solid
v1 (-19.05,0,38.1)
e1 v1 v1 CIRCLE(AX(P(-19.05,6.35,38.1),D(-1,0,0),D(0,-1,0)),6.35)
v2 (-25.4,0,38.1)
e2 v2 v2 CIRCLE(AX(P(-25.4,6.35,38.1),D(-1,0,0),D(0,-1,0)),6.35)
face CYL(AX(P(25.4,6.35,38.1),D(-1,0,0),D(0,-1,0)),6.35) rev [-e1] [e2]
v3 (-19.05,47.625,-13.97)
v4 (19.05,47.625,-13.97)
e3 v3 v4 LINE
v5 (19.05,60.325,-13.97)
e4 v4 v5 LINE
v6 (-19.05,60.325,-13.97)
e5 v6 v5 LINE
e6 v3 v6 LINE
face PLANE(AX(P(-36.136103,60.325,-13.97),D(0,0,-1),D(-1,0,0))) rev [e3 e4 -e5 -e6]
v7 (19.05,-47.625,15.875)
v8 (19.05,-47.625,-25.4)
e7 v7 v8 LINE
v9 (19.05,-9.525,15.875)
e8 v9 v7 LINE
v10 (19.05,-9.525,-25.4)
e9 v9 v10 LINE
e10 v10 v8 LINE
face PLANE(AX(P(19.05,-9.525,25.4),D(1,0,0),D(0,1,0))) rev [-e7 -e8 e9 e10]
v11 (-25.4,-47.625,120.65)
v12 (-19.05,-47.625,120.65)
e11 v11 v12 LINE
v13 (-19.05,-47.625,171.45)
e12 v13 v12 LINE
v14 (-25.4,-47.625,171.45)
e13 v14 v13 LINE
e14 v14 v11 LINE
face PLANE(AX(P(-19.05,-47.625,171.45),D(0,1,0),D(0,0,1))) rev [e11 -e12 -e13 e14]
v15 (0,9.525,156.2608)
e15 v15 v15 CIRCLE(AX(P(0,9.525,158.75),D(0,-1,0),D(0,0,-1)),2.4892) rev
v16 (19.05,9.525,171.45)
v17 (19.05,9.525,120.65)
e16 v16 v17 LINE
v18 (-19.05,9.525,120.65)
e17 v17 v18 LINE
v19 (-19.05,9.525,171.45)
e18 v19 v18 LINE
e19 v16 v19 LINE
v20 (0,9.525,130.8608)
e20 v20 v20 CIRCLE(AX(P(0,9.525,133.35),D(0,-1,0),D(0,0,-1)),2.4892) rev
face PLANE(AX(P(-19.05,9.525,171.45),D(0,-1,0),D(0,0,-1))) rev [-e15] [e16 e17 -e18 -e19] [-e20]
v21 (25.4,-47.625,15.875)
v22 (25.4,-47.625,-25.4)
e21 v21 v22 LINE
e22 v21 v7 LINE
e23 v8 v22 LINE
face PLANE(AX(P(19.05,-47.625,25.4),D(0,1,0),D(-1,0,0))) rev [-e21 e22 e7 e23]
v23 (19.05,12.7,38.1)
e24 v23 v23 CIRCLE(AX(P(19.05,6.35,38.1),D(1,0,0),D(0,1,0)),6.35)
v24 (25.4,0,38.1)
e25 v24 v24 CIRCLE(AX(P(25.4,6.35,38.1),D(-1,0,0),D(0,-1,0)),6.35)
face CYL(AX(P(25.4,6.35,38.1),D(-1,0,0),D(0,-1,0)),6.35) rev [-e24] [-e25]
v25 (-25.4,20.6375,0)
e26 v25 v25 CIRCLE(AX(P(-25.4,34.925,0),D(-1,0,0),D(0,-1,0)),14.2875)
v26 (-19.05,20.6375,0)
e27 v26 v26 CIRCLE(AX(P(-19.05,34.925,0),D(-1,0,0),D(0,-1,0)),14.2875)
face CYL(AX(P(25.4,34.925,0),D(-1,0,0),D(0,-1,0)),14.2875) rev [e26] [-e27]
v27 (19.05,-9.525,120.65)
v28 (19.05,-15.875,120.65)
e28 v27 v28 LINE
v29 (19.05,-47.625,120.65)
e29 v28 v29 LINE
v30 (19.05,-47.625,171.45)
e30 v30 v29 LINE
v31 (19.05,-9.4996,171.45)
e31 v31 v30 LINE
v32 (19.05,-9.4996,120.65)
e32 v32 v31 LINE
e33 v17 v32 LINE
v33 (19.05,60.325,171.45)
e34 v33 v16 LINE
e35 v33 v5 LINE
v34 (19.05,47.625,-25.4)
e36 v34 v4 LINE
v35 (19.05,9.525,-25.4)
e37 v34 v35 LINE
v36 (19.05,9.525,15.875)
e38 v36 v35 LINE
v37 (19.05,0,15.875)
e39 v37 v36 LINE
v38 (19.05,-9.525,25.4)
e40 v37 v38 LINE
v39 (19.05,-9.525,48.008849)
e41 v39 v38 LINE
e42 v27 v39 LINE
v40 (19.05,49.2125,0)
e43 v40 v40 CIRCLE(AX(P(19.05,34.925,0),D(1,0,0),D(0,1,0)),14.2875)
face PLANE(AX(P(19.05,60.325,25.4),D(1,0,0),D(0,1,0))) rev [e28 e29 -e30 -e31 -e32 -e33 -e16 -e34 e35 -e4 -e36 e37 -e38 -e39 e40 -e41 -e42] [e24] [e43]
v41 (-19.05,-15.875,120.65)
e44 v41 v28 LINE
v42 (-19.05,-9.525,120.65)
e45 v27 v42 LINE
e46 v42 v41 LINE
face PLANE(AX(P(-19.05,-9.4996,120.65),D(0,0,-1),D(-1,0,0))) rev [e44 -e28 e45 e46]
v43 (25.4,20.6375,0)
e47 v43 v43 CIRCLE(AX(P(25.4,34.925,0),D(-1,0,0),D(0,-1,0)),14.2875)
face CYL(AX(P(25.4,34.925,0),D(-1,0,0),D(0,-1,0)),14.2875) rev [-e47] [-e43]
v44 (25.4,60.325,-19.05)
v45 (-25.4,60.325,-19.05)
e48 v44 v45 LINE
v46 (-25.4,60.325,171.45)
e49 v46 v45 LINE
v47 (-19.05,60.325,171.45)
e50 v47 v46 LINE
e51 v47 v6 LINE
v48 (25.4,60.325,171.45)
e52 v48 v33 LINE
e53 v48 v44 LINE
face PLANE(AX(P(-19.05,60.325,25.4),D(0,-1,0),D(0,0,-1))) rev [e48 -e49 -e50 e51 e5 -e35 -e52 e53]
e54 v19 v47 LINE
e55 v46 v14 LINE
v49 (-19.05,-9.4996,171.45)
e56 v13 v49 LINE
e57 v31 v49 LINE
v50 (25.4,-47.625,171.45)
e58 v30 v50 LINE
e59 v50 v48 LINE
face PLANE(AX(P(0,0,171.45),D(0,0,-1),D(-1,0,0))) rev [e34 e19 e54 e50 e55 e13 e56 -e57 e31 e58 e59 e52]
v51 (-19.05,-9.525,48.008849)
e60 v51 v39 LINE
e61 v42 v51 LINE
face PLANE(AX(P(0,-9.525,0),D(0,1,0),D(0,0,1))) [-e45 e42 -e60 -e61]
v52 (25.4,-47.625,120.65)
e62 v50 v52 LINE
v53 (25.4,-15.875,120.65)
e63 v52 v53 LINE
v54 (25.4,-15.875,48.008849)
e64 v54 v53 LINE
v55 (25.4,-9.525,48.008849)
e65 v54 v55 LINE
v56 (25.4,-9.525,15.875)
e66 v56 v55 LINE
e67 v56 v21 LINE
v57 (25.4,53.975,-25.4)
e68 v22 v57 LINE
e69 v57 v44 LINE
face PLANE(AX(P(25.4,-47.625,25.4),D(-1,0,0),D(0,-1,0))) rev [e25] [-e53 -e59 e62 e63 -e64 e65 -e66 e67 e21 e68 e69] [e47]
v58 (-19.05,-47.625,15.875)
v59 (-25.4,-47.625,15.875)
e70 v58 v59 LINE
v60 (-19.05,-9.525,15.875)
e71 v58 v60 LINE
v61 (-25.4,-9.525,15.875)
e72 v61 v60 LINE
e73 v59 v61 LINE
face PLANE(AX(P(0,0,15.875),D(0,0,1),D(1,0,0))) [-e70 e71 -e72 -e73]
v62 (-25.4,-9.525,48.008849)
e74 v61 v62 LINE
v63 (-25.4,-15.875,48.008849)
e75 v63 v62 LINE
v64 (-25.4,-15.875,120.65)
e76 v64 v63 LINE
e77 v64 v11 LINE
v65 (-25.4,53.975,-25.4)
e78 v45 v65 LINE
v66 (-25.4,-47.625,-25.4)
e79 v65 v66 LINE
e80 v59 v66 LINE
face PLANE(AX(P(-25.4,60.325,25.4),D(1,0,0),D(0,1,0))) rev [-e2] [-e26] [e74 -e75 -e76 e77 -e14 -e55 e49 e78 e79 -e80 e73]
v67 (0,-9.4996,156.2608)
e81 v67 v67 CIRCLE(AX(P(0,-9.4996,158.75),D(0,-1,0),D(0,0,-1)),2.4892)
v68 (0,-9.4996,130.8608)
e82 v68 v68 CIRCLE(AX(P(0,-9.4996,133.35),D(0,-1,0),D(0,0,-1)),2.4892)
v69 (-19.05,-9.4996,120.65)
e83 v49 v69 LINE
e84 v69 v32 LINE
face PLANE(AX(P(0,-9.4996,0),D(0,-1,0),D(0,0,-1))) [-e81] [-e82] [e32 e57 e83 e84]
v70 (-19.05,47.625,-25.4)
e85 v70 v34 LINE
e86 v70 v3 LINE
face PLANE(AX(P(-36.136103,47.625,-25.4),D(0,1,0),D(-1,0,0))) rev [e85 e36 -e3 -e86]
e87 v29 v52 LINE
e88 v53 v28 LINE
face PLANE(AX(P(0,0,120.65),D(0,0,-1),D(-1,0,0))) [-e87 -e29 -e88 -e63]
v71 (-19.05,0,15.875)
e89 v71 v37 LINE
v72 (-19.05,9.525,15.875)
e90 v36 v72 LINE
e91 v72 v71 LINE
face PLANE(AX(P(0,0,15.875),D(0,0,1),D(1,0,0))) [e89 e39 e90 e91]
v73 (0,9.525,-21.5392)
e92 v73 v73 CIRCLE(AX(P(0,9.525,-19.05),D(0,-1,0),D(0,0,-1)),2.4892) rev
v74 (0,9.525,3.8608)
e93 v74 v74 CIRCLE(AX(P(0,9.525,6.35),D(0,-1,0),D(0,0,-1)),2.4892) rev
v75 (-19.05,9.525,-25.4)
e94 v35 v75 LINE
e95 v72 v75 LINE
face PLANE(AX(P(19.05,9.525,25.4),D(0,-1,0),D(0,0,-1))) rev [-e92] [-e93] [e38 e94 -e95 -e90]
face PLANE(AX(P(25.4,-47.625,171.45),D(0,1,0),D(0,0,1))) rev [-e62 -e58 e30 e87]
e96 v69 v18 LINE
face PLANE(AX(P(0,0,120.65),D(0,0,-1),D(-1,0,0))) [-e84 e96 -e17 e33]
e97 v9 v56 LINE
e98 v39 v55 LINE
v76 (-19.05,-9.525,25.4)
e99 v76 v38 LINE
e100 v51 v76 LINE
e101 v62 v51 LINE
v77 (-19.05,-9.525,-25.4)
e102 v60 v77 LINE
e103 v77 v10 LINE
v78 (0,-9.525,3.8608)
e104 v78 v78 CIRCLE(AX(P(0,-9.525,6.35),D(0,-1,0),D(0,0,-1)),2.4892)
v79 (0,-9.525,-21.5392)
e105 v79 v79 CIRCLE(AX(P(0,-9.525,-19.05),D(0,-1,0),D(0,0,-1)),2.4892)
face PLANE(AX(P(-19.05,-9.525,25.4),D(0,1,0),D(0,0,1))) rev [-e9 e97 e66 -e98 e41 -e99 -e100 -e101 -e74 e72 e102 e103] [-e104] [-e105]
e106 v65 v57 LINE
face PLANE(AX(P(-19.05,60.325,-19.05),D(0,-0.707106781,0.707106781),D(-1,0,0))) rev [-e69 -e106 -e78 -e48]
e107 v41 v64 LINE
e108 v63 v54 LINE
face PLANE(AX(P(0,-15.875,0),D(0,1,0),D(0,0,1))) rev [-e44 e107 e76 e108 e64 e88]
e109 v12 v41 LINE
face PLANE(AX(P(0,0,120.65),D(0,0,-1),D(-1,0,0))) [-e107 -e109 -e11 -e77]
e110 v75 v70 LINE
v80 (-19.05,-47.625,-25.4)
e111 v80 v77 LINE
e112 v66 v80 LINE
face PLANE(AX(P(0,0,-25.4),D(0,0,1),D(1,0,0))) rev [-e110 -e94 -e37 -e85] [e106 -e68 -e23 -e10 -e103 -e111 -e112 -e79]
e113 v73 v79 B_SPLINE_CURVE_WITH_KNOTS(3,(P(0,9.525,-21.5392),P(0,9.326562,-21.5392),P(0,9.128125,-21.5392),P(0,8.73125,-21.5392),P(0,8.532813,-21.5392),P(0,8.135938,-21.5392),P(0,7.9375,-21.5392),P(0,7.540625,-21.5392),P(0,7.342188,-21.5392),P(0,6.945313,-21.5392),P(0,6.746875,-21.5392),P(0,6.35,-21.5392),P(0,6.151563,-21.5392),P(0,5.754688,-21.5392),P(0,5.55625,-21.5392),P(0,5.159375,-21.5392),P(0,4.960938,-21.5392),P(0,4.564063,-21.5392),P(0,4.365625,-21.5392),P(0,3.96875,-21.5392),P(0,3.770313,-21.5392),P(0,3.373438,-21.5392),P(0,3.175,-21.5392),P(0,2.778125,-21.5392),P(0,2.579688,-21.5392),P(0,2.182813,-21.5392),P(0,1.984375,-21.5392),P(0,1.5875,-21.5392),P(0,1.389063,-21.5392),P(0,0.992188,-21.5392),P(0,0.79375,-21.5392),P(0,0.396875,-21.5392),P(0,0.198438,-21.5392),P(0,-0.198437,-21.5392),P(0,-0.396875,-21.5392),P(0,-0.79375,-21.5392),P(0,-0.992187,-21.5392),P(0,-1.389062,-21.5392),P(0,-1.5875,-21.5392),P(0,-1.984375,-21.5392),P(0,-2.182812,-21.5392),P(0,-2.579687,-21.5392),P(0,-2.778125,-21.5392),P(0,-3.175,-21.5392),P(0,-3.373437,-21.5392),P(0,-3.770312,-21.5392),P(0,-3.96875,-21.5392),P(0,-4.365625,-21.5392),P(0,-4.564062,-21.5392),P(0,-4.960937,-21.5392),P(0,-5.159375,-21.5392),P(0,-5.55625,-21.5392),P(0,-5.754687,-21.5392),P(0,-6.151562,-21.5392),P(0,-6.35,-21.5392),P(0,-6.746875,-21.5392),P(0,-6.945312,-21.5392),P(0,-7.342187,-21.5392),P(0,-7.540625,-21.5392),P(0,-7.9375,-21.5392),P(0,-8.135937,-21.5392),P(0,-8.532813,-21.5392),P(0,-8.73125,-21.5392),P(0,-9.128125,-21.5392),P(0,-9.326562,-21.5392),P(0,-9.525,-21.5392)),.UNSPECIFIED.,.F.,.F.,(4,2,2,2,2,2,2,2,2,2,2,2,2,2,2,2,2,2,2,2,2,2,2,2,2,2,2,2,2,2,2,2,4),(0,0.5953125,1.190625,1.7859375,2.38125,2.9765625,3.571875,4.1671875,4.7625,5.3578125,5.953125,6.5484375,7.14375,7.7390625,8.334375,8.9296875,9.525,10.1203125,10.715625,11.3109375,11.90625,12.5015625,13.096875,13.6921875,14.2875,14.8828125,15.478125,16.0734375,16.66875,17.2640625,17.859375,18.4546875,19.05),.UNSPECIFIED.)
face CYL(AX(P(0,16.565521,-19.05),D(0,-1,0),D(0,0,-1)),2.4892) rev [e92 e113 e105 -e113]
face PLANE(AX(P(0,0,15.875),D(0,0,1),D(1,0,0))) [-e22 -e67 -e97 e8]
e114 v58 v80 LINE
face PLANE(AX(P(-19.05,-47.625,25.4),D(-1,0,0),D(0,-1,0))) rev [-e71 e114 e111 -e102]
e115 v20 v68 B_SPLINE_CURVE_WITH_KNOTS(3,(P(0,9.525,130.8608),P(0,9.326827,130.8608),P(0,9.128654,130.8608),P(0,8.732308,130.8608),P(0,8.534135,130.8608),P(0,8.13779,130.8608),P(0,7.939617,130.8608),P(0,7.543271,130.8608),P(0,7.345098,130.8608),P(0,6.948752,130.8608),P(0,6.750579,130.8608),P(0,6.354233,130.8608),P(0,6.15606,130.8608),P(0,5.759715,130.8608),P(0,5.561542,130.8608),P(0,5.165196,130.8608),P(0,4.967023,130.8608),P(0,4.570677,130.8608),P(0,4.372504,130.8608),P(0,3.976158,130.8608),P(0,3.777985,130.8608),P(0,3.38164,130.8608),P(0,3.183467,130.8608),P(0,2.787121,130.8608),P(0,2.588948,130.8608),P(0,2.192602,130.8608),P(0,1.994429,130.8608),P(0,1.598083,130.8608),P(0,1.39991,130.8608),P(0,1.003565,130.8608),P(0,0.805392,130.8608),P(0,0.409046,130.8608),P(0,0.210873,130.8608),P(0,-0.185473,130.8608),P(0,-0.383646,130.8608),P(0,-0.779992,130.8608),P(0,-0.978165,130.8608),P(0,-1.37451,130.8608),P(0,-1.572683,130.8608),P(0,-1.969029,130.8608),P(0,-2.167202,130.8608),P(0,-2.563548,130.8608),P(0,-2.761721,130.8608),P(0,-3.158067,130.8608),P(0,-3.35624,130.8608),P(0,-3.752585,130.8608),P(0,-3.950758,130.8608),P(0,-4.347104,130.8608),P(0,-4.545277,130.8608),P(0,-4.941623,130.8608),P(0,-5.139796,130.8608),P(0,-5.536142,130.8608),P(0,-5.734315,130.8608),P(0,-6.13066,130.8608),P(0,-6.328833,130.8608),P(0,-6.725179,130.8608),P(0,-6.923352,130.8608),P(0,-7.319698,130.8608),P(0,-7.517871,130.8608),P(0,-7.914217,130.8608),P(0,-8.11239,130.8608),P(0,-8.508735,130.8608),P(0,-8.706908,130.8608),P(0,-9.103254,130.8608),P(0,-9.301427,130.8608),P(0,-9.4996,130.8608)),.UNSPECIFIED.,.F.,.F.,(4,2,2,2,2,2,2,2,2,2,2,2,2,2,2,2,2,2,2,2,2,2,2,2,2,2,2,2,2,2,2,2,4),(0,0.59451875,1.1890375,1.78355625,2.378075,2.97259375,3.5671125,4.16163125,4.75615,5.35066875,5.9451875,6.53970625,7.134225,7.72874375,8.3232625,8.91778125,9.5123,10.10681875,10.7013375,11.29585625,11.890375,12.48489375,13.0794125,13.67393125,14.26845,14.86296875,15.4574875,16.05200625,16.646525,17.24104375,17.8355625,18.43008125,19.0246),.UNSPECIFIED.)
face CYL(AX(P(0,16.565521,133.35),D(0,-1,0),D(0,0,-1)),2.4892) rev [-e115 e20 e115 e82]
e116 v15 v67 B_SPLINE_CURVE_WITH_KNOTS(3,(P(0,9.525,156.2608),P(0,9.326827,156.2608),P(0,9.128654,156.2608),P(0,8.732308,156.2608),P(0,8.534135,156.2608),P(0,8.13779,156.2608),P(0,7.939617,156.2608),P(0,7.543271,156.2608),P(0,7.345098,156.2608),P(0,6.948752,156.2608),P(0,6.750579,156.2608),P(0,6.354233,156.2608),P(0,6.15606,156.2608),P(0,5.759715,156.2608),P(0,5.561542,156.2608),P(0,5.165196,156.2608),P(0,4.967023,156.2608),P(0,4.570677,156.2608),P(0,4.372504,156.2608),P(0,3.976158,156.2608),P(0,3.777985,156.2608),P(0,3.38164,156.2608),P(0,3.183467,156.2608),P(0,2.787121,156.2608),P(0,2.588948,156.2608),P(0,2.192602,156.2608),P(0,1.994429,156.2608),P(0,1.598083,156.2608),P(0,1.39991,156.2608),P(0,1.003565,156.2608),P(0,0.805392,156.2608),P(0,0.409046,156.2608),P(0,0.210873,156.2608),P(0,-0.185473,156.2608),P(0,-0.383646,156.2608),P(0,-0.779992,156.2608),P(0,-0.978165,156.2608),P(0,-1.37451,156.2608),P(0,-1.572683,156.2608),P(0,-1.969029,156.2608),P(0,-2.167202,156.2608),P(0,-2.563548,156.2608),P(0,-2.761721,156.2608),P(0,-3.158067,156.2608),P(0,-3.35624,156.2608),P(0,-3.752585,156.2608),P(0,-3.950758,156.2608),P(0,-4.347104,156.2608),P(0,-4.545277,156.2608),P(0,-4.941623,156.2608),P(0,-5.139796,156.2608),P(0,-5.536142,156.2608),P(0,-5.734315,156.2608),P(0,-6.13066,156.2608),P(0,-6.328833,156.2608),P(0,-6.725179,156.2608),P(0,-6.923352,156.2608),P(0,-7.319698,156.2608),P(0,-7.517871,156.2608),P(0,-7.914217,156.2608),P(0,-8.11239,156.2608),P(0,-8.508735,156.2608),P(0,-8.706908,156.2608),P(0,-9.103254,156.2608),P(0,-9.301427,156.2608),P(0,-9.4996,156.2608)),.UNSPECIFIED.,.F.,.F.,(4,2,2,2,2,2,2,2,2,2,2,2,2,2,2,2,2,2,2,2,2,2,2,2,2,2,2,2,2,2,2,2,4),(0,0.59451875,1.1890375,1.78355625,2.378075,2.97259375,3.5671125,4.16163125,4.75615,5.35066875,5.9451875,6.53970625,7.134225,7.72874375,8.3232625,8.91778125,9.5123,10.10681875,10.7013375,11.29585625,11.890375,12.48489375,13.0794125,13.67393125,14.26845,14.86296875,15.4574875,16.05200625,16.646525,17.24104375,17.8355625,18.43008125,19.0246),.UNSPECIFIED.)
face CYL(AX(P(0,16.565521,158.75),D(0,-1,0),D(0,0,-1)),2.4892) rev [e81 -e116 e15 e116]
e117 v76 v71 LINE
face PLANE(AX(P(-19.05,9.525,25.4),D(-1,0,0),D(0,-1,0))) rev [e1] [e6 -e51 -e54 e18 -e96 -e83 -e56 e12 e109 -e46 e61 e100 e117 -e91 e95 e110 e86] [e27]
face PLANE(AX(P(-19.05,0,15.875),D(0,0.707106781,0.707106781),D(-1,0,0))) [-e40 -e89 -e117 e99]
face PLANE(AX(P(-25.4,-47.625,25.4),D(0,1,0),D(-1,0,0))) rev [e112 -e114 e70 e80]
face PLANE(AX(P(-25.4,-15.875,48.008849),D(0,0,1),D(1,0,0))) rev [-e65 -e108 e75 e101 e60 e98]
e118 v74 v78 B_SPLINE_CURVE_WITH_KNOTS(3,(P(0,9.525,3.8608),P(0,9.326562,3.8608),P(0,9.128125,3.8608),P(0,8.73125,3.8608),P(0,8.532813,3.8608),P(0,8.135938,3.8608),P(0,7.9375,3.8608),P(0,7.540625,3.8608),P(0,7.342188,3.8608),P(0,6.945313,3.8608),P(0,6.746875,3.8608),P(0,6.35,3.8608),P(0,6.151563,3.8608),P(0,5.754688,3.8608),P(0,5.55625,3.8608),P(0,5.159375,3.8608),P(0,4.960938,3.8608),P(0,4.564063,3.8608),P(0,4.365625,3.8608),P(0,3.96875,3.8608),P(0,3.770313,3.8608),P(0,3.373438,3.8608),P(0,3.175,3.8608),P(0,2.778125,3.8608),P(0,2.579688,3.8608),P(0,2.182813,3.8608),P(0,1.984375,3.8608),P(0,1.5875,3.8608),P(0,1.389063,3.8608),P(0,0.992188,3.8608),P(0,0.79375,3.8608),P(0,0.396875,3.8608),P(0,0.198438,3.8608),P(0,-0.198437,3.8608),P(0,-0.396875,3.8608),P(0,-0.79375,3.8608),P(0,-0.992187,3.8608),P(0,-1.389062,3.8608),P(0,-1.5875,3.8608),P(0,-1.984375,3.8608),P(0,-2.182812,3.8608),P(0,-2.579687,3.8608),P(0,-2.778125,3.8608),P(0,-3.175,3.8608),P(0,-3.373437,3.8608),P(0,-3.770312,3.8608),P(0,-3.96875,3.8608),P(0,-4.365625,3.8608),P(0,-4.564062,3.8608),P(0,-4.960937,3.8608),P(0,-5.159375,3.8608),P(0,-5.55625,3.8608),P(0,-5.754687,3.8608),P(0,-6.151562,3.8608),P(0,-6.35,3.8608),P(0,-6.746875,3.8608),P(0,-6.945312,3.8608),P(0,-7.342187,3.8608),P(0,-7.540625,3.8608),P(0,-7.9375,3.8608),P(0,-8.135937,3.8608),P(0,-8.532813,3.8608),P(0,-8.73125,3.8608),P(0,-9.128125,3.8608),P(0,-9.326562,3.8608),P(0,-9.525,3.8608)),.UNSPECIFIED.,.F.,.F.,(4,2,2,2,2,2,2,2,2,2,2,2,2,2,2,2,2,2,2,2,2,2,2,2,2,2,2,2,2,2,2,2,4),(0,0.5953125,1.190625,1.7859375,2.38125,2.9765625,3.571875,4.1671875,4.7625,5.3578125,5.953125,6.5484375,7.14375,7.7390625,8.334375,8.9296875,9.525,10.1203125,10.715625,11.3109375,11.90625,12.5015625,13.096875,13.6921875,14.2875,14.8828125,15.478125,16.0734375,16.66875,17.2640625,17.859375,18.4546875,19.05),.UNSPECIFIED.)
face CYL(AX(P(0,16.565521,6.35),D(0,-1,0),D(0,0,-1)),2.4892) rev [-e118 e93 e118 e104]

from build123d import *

# Parameters (mm, degrees)
BOSS_EXTRUDE1_DEPTH = 25.4
SKETCH2_R           = 14.2875
CUT_EXTRUDE1_DEPTH  = 83.854726027
SKETCH3_W           = 50.8
SKETCH3_H           = 38.1
CUT_EXTRUDE3_DEPTH  = 9.525
SKETCH4_W           = 11.43
SKETCH4_H           = 12.7
BOSS_EXTRUDE2_DEPTH = 38.1
CHAMFER1_SIZE       = 6.35
SKETCH5_W           = 6.35
SKETCH5_H           = 69.85
BOSS_EXTRUDE3_DEPTH = 95.25
SKETCH7_R           = 6.35
CUT_EXTRUDE5_DEPTH  = 145.139405178
SKETCH8_W           = 38.1
SKETCH8_H           = 9.525
CUT_EXTRUDE6_DEPTH  = 9.525
CHAMFER4_SIZE       = 9.525
SKETCH10_W          = 50.8
SKETCH10_H          = 72.641150816
BOSS_EXTRUDE5_DEPTH = 6.35
BOSS_EXTRUDE9_DEPTH = 50.8
SKETCH13_W          = 38.1
SKETCH13_H          = 50.8
CUT_EXTRUDE8_DEPTH  = 6.3754
SKETCH14_R          = 2.4892
CUT_EXTRUDE9_DEPTH  = 19.05
SKETCH15_R          = 2.4892
CUT_EXTRUDE10_DEPTH = 19.0246


with BuildPart() as part:
    # Sketch1 → Boss-Extrude1 (new, symmetric)
    with BuildSketch(Plane.XY):
        Polygon((-25.4, -47.625), (-19.05, -47.625), (-19.05, -9.525), (19.05, -9.525), (19.05, -47.625), (25.4, -47.625), (25.4, 60.325), (19.05, 60.325), (19.05, 9.525), (-19.05, 9.525), (-19.05, 60.325), (-25.4, 60.325), align=None)
    extrude(amount=BOSS_EXTRUDE1_DEPTH, both=True)

    # Sketch2 → Cut-Extrude1 (cut, through all)
    with BuildSketch(Plane.ZY.offset(25.4)):
        with Locations(Location((0, 34.925, 0), (0, 0, 270))):
            Circle(SKETCH2_R)
    extrude(amount=-CUT_EXTRUDE1_DEPTH, mode=Mode.SUBTRACT)

    # Sketch3 → Cut-Extrude3 (cut)
    with BuildSketch(Plane(origin=(0, 0, 25.4), x_dir=(-1, 0, 0), z_dir=(0, 0, -1))):
        with Locations((0, -28.575)):
            Rectangle(SKETCH3_W, SKETCH3_H)
    extrude(amount=CUT_EXTRUDE3_DEPTH, mode=Mode.SUBTRACT)

    # Sketch4 → Boss-Extrude2 (add)
    with BuildSketch(Plane.ZY.offset(-19.05)):
        with Locations((-19.685, 53.975)):
            Rectangle(SKETCH4_W, SKETCH4_H)
    extrude(amount=BOSS_EXTRUDE2_DEPTH)

    # Chamfer1
    chamfer1_edges = [part.edges().sort_by_distance(p)[0] for p in [
        (0, 60.325, -25.4),
    ]]
    chamfer(chamfer1_edges, length=CHAMFER1_SIZE)

    # Sketch5 → Boss-Extrude3 (add)
    with BuildSketch(Plane.XY.offset(25.4)):
        with Locations((-22.225, 25.4)):
            Rectangle(SKETCH5_W, SKETCH5_H)
        with Locations((22.225, 25.4)):
            Rectangle(SKETCH5_W, SKETCH5_H)
    extrude(amount=BOSS_EXTRUDE3_DEPTH)

    # Sketch7 → Cut-Extrude5 (cut, through all)
    with BuildSketch(Plane.ZY.offset(25.4)):
        with Locations(Location((38.1, 6.35, 0), (0, 0, 270))):
            Circle(SKETCH7_R)
    extrude(amount=-CUT_EXTRUDE5_DEPTH, mode=Mode.SUBTRACT)

    # Sketch8 → Cut-Extrude6 (cut)
    with BuildSketch(Plane.XY.offset(25.4)):
        with Locations((0, 4.7625)):
            Rectangle(SKETCH8_W, SKETCH8_H)
    extrude(amount=-CUT_EXTRUDE6_DEPTH, mode=Mode.SUBTRACT)

    # Chamfer4
    chamfer4_edges = [part.edges().sort_by_distance(p)[0] for p in [
        (0, 0, 25.4),
    ]]
    chamfer(chamfer4_edges, length=CHAMFER4_SIZE - 0.0001)  # a hair under: the kernel refuses the full size

    # Sketch10 → Boss-Extrude5 (add)
    with BuildSketch(Plane.XZ.offset(9.525)):
        with Locations((0, 84.329424592)):
            Rectangle(SKETCH10_W, SKETCH10_H)
    extrude(amount=BOSS_EXTRUDE5_DEPTH)

    # Sketch12 → Boss-Extrude9 (add)
    with BuildSketch(Plane.XY.offset(120.65)):
        Polygon((-25.4, 60.325), (-19.05, 60.325), (-19.05, 9.525), (19.05, 9.525), (19.05, 60.325), (25.4, 60.325), (25.4, -47.625), (19.05, -47.625), (19.05, -15.875), (-19.05, -15.875), (-19.05, -47.625), (-25.4, -47.625), align=None)
    extrude(amount=BOSS_EXTRUDE9_DEPTH)

    # Sketch13 → Cut-Extrude8 (cut)
    with BuildSketch(Plane(origin=(0, -15.875, 0), x_dir=(-1, 0, 0), z_dir=(0, -1, 0))):
        with Locations((0, -146.05)):
            Rectangle(SKETCH13_W, SKETCH13_H)
    extrude(amount=-CUT_EXTRUDE8_DEPTH, mode=Mode.SUBTRACT)

    # Sketch14 → Cut-Extrude9 (cut)
    with BuildSketch(Plane.XZ.offset(9.525)):
        with Locations(Location((0, -19.05, 0), (0, 0, 270))):
            Circle(SKETCH14_R)
        with Locations(Location((0, 6.35, 0), (0, 0, 270))):
            Circle(SKETCH14_R)
    extrude(amount=-CUT_EXTRUDE9_DEPTH, mode=Mode.SUBTRACT)

    # Sketch15 → Cut-Extrude10 (cut)
    with BuildSketch(Plane.XZ.offset(9.4996)):
        with Locations(Location((0, 158.75, 0), (0, 0, 270))):
            Circle(SKETCH15_R)
        with Locations(Location((0, 133.35, 0), (0, 0, 270))):
            Circle(SKETCH15_R)
    extrude(amount=-CUT_EXTRUDE10_DEPTH, mode=Mode.SUBTRACT)


solid = part.part
